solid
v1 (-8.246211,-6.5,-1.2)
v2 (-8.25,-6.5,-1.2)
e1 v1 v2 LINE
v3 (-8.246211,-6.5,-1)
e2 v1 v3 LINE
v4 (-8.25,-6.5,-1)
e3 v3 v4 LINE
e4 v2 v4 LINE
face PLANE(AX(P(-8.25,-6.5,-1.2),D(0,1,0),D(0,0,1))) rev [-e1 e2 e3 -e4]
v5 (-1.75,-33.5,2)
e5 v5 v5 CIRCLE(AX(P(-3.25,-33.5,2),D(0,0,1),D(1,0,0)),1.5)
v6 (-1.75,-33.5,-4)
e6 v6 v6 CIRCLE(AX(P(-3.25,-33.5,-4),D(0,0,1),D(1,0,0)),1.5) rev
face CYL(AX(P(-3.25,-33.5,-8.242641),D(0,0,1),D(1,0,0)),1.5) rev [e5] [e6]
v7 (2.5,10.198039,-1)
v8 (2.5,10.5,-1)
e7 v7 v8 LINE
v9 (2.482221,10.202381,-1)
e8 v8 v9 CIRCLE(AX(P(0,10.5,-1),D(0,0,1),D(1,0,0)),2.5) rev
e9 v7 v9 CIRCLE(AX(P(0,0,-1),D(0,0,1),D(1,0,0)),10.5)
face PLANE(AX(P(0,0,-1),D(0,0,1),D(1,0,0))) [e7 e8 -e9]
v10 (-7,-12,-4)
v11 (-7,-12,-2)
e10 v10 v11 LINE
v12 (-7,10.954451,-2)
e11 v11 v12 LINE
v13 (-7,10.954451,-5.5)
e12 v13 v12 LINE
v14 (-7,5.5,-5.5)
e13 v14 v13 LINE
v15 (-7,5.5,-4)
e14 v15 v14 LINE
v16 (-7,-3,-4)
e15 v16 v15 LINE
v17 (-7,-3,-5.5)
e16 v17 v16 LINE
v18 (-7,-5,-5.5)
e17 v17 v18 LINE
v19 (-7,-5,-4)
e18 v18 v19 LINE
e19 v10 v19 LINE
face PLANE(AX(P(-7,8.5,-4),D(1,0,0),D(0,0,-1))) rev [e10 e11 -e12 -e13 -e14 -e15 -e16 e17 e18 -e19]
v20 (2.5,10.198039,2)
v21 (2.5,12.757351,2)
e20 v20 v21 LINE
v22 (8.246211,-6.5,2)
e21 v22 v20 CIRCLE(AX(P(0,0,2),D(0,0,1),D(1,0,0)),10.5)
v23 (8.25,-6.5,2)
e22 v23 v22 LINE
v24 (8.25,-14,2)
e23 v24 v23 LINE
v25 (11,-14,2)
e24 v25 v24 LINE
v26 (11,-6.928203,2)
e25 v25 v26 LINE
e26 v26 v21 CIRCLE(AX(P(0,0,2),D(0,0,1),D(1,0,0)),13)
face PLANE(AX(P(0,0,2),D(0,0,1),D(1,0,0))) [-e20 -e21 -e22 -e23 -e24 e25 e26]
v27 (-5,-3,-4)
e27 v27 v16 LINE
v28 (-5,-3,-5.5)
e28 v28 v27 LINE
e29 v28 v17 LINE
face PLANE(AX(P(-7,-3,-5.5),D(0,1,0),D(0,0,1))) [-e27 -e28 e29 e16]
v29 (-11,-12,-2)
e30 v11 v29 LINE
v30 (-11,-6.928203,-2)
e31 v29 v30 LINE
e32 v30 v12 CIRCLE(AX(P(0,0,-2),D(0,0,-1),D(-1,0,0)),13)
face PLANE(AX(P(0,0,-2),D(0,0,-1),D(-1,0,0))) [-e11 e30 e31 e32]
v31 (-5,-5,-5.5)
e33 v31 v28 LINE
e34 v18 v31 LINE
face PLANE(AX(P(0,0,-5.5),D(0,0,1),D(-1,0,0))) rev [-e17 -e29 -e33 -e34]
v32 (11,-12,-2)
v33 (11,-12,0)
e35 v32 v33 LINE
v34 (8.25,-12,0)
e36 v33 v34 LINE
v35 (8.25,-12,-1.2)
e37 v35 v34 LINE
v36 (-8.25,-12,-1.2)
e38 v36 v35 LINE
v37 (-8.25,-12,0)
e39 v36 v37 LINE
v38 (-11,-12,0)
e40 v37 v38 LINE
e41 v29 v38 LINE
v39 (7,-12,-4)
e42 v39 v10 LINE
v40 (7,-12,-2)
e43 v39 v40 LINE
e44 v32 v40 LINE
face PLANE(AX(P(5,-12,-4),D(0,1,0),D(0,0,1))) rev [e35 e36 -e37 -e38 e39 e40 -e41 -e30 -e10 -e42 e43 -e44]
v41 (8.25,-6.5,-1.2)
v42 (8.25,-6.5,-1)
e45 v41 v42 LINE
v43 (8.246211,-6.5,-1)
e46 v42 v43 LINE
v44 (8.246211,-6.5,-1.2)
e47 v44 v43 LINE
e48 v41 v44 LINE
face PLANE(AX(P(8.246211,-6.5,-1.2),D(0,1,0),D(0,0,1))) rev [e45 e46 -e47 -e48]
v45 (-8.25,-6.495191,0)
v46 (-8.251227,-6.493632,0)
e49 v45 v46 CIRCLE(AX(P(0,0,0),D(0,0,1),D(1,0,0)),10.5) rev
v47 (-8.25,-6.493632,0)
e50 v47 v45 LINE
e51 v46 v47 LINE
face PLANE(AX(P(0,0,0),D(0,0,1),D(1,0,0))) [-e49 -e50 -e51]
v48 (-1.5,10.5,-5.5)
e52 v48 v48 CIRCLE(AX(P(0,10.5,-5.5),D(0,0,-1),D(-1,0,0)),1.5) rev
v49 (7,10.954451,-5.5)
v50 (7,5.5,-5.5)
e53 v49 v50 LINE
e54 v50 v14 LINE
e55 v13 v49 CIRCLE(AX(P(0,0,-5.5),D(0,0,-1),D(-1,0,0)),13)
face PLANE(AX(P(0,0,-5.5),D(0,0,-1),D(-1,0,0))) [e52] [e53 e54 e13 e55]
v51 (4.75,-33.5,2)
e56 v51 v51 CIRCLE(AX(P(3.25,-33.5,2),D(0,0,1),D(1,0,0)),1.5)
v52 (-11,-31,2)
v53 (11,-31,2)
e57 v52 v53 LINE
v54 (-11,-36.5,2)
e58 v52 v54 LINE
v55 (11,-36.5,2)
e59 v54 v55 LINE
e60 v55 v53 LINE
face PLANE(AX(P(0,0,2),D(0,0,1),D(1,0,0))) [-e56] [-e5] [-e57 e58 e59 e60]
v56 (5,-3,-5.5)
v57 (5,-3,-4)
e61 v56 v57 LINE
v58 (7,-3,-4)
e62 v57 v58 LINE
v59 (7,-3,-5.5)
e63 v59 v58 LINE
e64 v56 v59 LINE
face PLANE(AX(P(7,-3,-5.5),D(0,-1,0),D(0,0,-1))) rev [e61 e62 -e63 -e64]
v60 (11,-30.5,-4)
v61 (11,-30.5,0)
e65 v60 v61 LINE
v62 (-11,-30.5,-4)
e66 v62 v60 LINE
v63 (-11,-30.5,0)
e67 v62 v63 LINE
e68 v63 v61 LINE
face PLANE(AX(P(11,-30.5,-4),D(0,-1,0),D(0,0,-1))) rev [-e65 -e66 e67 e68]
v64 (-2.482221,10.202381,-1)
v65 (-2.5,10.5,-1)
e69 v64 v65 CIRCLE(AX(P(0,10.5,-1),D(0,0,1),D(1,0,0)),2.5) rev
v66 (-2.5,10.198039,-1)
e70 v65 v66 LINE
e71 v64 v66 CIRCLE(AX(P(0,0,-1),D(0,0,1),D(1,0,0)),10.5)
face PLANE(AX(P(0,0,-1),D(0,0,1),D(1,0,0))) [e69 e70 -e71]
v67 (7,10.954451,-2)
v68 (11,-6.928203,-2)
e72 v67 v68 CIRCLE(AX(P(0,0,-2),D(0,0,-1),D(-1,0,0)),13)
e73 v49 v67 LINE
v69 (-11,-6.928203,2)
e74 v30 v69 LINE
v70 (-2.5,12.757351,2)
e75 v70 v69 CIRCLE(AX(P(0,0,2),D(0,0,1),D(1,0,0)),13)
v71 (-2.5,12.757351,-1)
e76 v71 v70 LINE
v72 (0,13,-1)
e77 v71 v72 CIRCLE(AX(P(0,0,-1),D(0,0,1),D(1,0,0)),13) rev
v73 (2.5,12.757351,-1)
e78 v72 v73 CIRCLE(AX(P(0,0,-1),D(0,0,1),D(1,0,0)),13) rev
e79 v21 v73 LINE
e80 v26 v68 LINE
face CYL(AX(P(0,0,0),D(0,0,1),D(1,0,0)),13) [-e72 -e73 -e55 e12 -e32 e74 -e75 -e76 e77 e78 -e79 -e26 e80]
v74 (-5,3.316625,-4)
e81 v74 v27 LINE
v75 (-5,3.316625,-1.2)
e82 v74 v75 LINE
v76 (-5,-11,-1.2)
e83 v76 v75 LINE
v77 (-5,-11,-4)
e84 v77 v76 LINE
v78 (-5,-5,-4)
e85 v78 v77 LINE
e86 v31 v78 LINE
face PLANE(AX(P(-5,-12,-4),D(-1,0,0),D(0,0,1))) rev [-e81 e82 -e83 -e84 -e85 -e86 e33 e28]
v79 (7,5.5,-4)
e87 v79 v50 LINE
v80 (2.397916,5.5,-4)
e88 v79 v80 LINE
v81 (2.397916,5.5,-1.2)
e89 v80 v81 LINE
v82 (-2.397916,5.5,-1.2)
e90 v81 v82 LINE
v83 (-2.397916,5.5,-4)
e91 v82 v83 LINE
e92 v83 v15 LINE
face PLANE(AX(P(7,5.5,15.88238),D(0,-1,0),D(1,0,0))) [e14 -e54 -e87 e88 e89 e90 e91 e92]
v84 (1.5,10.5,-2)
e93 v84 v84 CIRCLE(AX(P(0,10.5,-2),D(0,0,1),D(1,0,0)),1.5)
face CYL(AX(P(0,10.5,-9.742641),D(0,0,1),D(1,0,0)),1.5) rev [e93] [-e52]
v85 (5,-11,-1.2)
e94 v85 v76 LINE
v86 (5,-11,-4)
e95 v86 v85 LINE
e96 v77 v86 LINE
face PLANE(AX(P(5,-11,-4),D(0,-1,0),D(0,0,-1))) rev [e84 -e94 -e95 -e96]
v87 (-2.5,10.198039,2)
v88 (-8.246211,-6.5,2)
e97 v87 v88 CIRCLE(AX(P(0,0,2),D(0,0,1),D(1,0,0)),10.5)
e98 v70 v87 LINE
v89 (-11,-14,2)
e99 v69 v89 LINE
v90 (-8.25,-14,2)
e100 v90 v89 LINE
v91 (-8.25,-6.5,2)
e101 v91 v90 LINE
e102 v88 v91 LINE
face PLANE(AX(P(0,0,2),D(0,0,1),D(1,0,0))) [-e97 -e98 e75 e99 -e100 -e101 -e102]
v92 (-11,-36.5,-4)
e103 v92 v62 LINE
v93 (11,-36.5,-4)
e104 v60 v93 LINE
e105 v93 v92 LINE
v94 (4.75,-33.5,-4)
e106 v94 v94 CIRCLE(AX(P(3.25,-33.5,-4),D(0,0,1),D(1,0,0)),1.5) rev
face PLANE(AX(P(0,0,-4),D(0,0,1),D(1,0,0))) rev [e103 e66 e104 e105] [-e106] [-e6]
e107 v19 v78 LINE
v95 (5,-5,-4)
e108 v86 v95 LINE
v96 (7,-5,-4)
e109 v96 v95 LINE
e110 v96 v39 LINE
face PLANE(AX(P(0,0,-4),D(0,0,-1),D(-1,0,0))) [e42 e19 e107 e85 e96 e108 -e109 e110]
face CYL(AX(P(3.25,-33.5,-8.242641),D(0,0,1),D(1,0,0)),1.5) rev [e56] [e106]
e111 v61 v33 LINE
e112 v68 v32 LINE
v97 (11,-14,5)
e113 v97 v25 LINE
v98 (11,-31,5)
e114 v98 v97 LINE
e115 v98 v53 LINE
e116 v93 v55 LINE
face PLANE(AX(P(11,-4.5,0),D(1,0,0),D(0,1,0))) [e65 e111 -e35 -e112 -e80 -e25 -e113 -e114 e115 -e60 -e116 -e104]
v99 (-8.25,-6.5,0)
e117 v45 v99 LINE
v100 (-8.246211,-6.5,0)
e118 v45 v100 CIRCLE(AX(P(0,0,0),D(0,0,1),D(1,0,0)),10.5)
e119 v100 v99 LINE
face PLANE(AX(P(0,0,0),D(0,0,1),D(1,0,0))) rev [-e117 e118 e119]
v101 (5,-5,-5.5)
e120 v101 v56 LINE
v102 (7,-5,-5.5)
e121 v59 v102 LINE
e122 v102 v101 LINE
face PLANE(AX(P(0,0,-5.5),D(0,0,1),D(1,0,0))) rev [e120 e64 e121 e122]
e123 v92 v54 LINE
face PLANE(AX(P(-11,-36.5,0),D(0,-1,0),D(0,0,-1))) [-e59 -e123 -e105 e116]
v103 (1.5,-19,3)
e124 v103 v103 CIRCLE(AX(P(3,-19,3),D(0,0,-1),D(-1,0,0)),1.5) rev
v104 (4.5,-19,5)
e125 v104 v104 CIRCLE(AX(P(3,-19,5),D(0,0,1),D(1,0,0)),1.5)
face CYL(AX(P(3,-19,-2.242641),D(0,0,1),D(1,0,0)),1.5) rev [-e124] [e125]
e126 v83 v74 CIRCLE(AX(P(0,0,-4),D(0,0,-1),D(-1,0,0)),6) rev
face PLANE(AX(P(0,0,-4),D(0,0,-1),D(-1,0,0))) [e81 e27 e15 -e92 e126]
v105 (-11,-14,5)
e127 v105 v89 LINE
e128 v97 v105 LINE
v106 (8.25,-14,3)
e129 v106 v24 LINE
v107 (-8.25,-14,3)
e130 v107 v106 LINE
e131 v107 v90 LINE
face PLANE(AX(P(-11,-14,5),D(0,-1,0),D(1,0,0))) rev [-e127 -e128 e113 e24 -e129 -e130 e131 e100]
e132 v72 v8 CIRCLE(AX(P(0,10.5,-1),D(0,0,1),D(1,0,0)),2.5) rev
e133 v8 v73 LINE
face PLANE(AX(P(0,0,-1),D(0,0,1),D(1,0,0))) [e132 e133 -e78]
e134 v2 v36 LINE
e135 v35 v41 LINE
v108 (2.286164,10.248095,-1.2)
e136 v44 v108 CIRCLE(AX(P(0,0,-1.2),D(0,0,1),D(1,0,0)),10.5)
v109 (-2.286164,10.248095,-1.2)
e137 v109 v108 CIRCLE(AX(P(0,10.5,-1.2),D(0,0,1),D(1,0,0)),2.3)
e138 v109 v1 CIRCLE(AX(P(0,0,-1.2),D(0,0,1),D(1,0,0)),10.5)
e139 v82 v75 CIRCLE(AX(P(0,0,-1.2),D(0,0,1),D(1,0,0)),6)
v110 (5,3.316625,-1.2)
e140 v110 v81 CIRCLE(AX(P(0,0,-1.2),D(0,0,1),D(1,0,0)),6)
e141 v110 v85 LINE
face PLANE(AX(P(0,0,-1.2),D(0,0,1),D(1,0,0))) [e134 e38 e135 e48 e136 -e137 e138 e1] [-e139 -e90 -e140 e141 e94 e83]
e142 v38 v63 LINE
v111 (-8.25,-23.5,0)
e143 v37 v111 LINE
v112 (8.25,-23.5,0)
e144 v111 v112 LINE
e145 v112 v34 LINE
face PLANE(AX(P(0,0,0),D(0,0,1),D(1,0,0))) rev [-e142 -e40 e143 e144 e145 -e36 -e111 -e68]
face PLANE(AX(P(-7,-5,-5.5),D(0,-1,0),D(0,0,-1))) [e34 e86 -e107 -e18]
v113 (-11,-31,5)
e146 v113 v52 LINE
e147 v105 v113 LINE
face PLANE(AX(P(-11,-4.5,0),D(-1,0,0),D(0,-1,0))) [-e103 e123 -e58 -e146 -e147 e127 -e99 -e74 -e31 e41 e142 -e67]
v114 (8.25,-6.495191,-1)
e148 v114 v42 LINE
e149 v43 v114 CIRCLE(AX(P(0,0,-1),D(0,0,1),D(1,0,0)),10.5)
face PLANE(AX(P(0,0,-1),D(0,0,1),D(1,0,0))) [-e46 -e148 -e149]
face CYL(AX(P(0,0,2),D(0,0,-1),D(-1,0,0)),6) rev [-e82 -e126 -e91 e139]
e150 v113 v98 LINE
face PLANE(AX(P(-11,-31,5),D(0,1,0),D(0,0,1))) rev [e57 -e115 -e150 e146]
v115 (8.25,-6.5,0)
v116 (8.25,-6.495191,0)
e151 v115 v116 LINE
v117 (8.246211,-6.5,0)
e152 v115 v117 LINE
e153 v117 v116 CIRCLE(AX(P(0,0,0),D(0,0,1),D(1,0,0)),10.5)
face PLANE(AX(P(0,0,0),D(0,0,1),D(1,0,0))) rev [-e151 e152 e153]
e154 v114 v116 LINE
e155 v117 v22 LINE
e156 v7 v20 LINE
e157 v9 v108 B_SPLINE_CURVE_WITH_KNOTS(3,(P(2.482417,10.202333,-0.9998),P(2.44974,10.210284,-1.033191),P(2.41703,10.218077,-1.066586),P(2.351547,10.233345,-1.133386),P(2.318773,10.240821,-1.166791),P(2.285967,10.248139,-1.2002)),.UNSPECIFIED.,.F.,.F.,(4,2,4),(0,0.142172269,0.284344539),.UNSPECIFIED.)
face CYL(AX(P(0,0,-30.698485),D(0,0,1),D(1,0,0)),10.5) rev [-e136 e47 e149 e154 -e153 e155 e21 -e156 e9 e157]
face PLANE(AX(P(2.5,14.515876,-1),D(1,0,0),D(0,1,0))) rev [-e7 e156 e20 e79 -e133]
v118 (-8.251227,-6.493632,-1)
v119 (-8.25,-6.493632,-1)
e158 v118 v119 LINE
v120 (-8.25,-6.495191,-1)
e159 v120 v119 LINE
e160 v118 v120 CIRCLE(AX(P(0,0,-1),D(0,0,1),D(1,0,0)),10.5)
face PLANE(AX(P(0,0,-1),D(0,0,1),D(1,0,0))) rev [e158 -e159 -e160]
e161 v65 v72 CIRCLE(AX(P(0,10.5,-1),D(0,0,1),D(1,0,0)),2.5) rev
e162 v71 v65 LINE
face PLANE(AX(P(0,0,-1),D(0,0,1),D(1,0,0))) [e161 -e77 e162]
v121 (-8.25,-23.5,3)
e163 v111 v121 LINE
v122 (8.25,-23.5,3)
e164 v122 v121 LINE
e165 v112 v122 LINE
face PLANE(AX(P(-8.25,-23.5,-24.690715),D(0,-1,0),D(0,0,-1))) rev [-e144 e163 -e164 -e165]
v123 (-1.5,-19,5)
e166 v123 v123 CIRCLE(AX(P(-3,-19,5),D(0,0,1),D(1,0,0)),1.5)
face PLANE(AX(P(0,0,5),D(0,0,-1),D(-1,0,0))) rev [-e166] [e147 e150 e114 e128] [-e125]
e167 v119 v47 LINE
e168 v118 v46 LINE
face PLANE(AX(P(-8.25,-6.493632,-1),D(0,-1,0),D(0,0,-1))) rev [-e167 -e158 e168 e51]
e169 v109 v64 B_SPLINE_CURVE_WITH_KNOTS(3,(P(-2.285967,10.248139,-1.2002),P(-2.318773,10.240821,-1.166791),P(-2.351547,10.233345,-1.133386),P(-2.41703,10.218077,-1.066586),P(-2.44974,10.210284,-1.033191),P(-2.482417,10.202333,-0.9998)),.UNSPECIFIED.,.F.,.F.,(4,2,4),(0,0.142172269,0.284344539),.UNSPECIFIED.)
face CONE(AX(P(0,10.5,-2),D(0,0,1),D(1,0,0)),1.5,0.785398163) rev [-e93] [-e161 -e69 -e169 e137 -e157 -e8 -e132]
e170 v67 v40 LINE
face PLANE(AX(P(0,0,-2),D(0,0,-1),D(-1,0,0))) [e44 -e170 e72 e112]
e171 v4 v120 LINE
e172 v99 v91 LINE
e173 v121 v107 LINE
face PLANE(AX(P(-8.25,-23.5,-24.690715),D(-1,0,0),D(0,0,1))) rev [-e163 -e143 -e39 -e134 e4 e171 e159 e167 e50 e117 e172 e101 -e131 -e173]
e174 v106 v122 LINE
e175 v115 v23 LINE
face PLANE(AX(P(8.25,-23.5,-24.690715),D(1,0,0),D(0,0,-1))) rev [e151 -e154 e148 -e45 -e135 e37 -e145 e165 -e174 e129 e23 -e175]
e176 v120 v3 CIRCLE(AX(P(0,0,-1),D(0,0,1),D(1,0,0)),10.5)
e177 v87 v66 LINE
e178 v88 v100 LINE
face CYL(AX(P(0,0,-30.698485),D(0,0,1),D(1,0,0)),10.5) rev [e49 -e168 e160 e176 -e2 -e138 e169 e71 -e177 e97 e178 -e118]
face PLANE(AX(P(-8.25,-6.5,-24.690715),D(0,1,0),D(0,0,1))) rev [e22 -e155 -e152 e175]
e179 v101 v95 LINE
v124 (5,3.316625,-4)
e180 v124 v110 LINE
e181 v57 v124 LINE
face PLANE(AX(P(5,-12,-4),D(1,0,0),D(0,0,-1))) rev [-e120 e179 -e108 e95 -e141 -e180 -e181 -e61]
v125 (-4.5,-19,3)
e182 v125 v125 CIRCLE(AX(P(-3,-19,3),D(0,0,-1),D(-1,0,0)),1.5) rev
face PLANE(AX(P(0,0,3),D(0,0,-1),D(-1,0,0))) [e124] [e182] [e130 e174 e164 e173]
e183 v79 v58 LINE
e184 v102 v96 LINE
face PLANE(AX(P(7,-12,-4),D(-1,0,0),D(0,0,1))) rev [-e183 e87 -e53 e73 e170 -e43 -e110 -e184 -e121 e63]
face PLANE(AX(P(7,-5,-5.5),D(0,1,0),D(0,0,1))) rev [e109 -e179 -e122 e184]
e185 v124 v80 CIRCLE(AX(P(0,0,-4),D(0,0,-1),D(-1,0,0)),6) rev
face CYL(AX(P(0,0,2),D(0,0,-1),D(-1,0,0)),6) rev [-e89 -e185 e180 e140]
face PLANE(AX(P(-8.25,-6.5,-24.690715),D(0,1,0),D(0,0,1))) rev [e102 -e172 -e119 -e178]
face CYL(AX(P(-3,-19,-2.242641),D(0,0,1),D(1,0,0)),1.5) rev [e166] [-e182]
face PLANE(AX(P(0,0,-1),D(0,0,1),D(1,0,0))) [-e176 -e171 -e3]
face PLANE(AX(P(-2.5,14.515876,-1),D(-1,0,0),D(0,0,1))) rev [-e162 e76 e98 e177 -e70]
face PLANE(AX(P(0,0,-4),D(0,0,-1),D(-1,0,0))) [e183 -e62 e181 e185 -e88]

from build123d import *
from build123d.topology import SkipClean

# Parameters (mm, degrees)
SZKIC1_R                     = 12
SZKIC1_R_2                   = 6
DODANIE_WYCI_GNI_CIE1_DEPTH  = 2
SZKIC3_W                     = 22
SZKIC3_H                     = 32
DODANIE_WYCI_GNI_CIE2_DEPTH  = 2
SZKIC4_W                     = 22
SZKIC4_H                     = 6
DODANIE_WYCI_GNI_CIE3_DEPTH  = 4
SZKIC5_R                     = 1.5
WYTNIJ_WYCI_GNI_CIE1_DEPTH   = 6
SZKIC6_W                     = 10
SZKIC6_H                     = 1
DODANIE_WYCI_GNI_CIE4_DEPTH  = 4
DODANIE_WYCI_GNI_CIE5_START  = 4
DODANIE_WYCI_GNI_CIE5_DEPTH  = 4
DODANIE_WYCI_GNI_CIE6_START  = 4
DODANIE_WYCI_GNI_CIE6_DEPTH  = 4
SZKIC12_R                    = 13
SZKIC12_R_2                  = 8.25
DODANIE_WYCI_GNI_CIE7_DEPTH  = 2
SZKIC13_R                    = 8.25
WYTNIJ_WYCI_GNI_CIE5_DEPTH   = 2
DODANIE_WYCI_GNI_CIE8_DEPTH  = 4
DODANIE_WYCI_GNI_CIE9_START  = -4
DODANIE_WYCI_GNI_CIE9_DEPTH  = 5.5
SZKIC16_W                    = 5
SZKIC16_H                    = 8.571884582
WYTNIJ_WYCI_GNI_CIE6_DEPTH   = 3
SZKIC17_R                    = 1.5
WYTNIJ_WYCI_GNI_CIE7_DEPTH   = 5.5
SZKIC18_R                    = 8.25
WYTNIJ_WYCI_GNI_CIE8_DEPTH   = 1
SZKIC19_W                    = 2
SZKIC19_H                    = 2
DODANIE_WYCI_GNI_CIE10_DEPTH = 1.5
WYTNIJ_WYCI_GNI_CIE9_START   = -3
SZKIC20_R                    = 10.5
WYTNIJ_WYCI_GNI_CIE9_DEPTH   = 3
SZKIC21_W                    = 16.5
SZKIC21_H                    = 17
WYTNIJ_WYCI_GNI_CIE10_DEPTH  = 3
SZKIC22_W                    = 22
SZKIC22_H                    = 17
DODANIE_WYCI_GNI_CIE11_DEPTH = 3
SZKIC24_R                    = 1.5
WYTNIJ_WYCI_GNI_CIE11_DEPTH  = 3
SFAZOWANIE1_SIZE             = 1
DODANIE_WYCI_GNI_CIE14_START = 1
DODANIE_WYCI_GNI_CIE14_DEPTH = 1
DODANIE_WYCI_GNI_CIE15_START = 1
DODANIE_WYCI_GNI_CIE15_DEPTH = 1
SZKIC30_W                    = 2.75
SZKIC30_H                    = 5.506367645
DODANIE_WYCI_GNI_CIE16_DEPTH = 1
DODANIE_WYCI_GNI_CIE17_START = 1
DODANIE_WYCI_GNI_CIE17_DEPTH = 1
SZKIC32_W                    = 2.75
SZKIC32_H                    = 5.07179677
DODANIE_WYCI_GNI_CIE18_DEPTH = 1
SZKIC33_W                    = 16.5
SZKIC33_H                    = 9.5
WYTNIJ_WYCI_GNI_CIE12_DEPTH  = 1
WYTNIJ_WYCI_GNI_CIE13_START  = -0.2
WYTNIJ_WYCI_GNI_CIE13_DEPTH  = 0.2


with BuildPart() as part:
    # Szkic1 → Dodanie-wyciągnięcie1 (new body)
    with BuildSketch(Plane.XY):
        Circle(SZKIC1_R)
        Circle(SZKIC1_R_2, mode=Mode.SUBTRACT)
    extrude(amount=DODANIE_WYCI_GNI_CIE1_DEPTH)

    # Szkic3 → Dodanie-wyciągnięcie2 (add)
    with BuildSketch(Plane.XY.offset(2)):
        with Locations((0, -20.5)):
            Rectangle(SZKIC3_W, SZKIC3_H)
    extrude(amount=-DODANIE_WYCI_GNI_CIE2_DEPTH)

    # Szkic4 → Dodanie-wyciągnięcie3 (add)
    with BuildSketch(Plane(origin=(0, 0, 0), x_dir=(-1, 0, 0), z_dir=(0, 0, -1))):
        with Locations((0, -33.5)):
            Rectangle(SZKIC4_W, SZKIC4_H)
    extrude(amount=DODANIE_WYCI_GNI_CIE3_DEPTH)

    # Szkic5 → Wytnij-wyciągnięcie1 (cut)
    with BuildSketch(Plane.XY.offset(2)):
        with Locations((-3.25, -33.5)):
            Circle(SZKIC5_R)
        with Locations((3.25, -33.5)):
            Circle(SZKIC5_R)
    extrude(amount=-WYTNIJ_WYCI_GNI_CIE1_DEPTH, mode=Mode.SUBTRACT)

    # Szkic6 → Dodanie-wyciągnięcie4 (add)
    with BuildSketch(Plane(origin=(0, 0, 0), x_dir=(-1, 0, 0), z_dir=(0, 0, -1))):
        with Locations((0, -11.5)):
            Rectangle(SZKIC6_W, SZKIC6_H)
    extrude(amount=DODANIE_WYCI_GNI_CIE4_DEPTH)

    # Szkic7 → Dodanie-wyciągnięcie5 (add)
    with BuildSketch(Plane(origin=(0, 0, 0), x_dir=(-1, 0, 0), z_dir=(0, 0, -1)).offset(DODANIE_WYCI_GNI_CIE5_START)):
        with BuildLine():
            Line((-5, 8.5), (-5, 5.5))
            Line((-5, 5.5), (-5, 3.31662479))
            ThreePointArc((-5, 3.31662479), (0, 6), (5, 3.31662479))
            Line((5, 3.31662479), (5, 5.5))
            Line((5, 5.5), (5, 8.5))
            Line((5, 8.5), (-5, 8.5))
        make_face()
    extrude(amount=-DODANIE_WYCI_GNI_CIE5_DEPTH)

    # Szkic9 → Dodanie-wyciągnięcie6 (add)
    with BuildSketch(Plane(origin=(0, 0, 0), x_dir=(-1, 0, 0), z_dir=(0, 0, -1)).offset(DODANIE_WYCI_GNI_CIE6_START)):
        with BuildLine():
            Line((-7, 8.5), (-7, 9.746794345))
            ThreePointArc((-7, 9.746794345), (0, 12), (7, 9.746794345))
            Line((7, 9.746794345), (7, 8.5))
            Line((7, 8.5), (7, -12))
            Line((7, -12), (5, -12))
            Line((5, -12), (5, 8.5))
            Line((5, 8.5), (-5, 8.5))
            Line((-5, 8.5), (-5, -12))
            Line((-5, -12), (-7, -12))
            Line((-7, -12), (-7, 8.5))
        make_face()
    extrude(amount=-DODANIE_WYCI_GNI_CIE6_DEPTH)

    # Szkic12 → Dodanie-wyciągnięcie7 (add)
    with BuildSketch(Plane.XY.offset(2)):
        Circle(SZKIC12_R)
        Circle(SZKIC12_R_2, mode=Mode.SUBTRACT)
    extrude(amount=-DODANIE_WYCI_GNI_CIE7_DEPTH)

    # Szkic13 → Wytnij-wyciągnięcie5 (cut)
    with BuildSketch(Plane.XY.offset(2)):
        Circle(SZKIC13_R)
    extrude(amount=-WYTNIJ_WYCI_GNI_CIE5_DEPTH, mode=Mode.SUBTRACT)

    # Szkic14 → Dodanie-wyciągnięcie8 (add)
    with BuildSketch(Plane(origin=(0, 0, 0), x_dir=(-1, 0, 0), z_dir=(0, 0, -1))):
        with BuildLine():
            Line((-7, 10.95445115), (-7, 9.746794345))
            ThreePointArc((-7, 9.746794345), (0, 12), (7, 9.746794345))
            Line((7, 9.746794345), (7, 10.95445115))
            ThreePointArc((7, 10.95445115), (0, 13), (-7, 10.95445115))
        make_face()
    extrude(amount=DODANIE_WYCI_GNI_CIE8_DEPTH)

    # Szkic15 → Dodanie-wyciągnięcie9 (add)
    with BuildSketch(Plane(origin=(0, 0, -4), x_dir=(-1, 0, 0), z_dir=(0, 0, -1)).offset(DODANIE_WYCI_GNI_CIE9_START)):
        with BuildLine():
            Line((-7, 5.5), (7, 5.5))
            Line((7, 5.5), (7, 10.95445115))
            ThreePointArc((7, 10.95445115), (0, 13), (-7, 10.95445115))
            Line((-7, 10.95445115), (-7, 5.5))
        make_face()
    extrude(amount=DODANIE_WYCI_GNI_CIE9_DEPTH)

    # Szkic16 → Wytnij-wyciągnięcie6 (cut)
    with BuildSketch(Plane.XY.offset(2)):
        with Locations((0, 10.229933778)):
            Rectangle(SZKIC16_W, SZKIC16_H)
    extrude(amount=-WYTNIJ_WYCI_GNI_CIE6_DEPTH, mode=Mode.SUBTRACT)

    # Szkic17 → Wytnij-wyciągnięcie7 (cut)
    with BuildSketch(Plane.XY):
        with Locations((0, 10.5)):
            Circle(SZKIC17_R)
    extrude(amount=-WYTNIJ_WYCI_GNI_CIE7_DEPTH, mode=Mode.SUBTRACT)

    # Szkic18 → Wytnij-wyciągnięcie8 (cut)
    with BuildSketch(Plane.XY):
        Circle(SZKIC18_R)
    extrude(amount=-WYTNIJ_WYCI_GNI_CIE8_DEPTH, mode=Mode.SUBTRACT)

    # Szkic19 → Dodanie-wyciągnięcie10 (add)
    with BuildSketch(Plane(origin=(0, 0, -4), x_dir=(-1, 0, 0), z_dir=(0, 0, -1))):
        with Locations((-6, -4)):
            Rectangle(SZKIC19_W, SZKIC19_H)
    dodanie_wyci_gni_cie10 = extrude(amount=DODANIE_WYCI_GNI_CIE10_DEPTH)

    # Lustro1: Dodanie-wyciągnięcie10 across plane
    add(dodanie_wyci_gni_cie10.mirror(Plane(origin=(0, 0, 0), x_dir=(0, 0, 1), z_dir=(1, 0, 0))))

    # Szkic20 → Wytnij-wyciągnięcie9 (cut)
    with BuildSketch(Plane.XY.offset(2).offset(WYTNIJ_WYCI_GNI_CIE9_START)):
        Circle(SZKIC20_R)
    extrude(amount=WYTNIJ_WYCI_GNI_CIE9_DEPTH, mode=Mode.SUBTRACT)

    # Szkic21 → Wytnij-wyciągnięcie10 (cut)
    with BuildSketch(Plane.XY.offset(2)):
        with Locations((0, -15)):
            Rectangle(SZKIC21_W, SZKIC21_H)
    extrude(amount=-WYTNIJ_WYCI_GNI_CIE10_DEPTH, mode=Mode.SUBTRACT)

    # Szkic22 → Dodanie-wyciągnięcie11 (add)
    with BuildSketch(Plane.XY.offset(2)):
        with Locations((0, -22.5)):
            Rectangle(SZKIC22_W, SZKIC22_H)
    extrude(amount=DODANIE_WYCI_GNI_CIE11_DEPTH)

    # Szkic24 → Wytnij-wyciągnięcie11 (cut)
    with BuildSketch(Plane.XY.offset(5)):
        with Locations((-3, -19)):
            Circle(SZKIC24_R)
        with Locations((3, -19)):
            Circle(SZKIC24_R)
    extrude(amount=-WYTNIJ_WYCI_GNI_CIE11_DEPTH, mode=Mode.SUBTRACT)

    # Sfazowanie1
    sfazowanie1_edges = [part.edges().sort_by_distance(p)[0] for p in [
        (-1.5, 10.5, -1),
    ]]
    chamfer(sfazowanie1_edges, length=SFAZOWANIE1_SIZE - 0.0001)  # a hair under: the kernel refuses the full size

    # Szkic27 → Dodanie-wyciągnięcie14 (add)
    with SkipClean():  # the faces are left unmerged after this step: merging them gives an invalid solid
        with BuildSketch(Plane(origin=(0, 0, 0), x_dir=(-1, 0, 0), z_dir=(0, 0, -1)).offset(DODANIE_WYCI_GNI_CIE14_START)):
            with BuildLine():
                Line((-7, 7.826237921), (-7, 10.95445115))
                ThreePointArc((-7, 10.95445115), (-12.977033627, 0.772397723), (-8.25, -10.046765649))
                Line((-8.25, -10.046765649), (-8.25, -6.495190528))
                ThreePointArc((-8.25, -6.495190528), (-10.460231986, 0.912987837), (-7, 7.826237921))
            make_face()
            with BuildLine():
                Line((7, 7.826237921), (7, 10.95445115))
                ThreePointArc((7, 10.95445115), (12.977033627, 0.772397723), (8.25, -10.046765649))
                Line((8.25, -10.046765649), (8.25, -6.495190528))
                ThreePointArc((8.25, -6.495190528), (10.460231986, 0.912987837), (7, 7.826237921))
            make_face()
        extrude(amount=-DODANIE_WYCI_GNI_CIE14_DEPTH)

    # Szkic29 → Dodanie-wyciągnięcie15 (add)
    with SkipClean():  # the faces are left unmerged after this step: merging them gives an invalid solid
        with BuildSketch(Plane(origin=(0, 0, -1), x_dir=(-1, 0, 0), z_dir=(0, 0, -1)).offset(DODANIE_WYCI_GNI_CIE15_START)):
            with BuildLine():
                Line((11, -6.92820323), (11, -12))
                Line((11, -12), (5, -12))
                Line((5, -12), (5, -11))
                Line((5, -11), (5, 12))
                ThreePointArc((5, 12), (12.392304845, 3.92820323), (11, -6.92820323))
            make_face()
        extrude(amount=-DODANIE_WYCI_GNI_CIE15_DEPTH)

    # Szkic30 → Dodanie-wyciągnięcie16 (add)
    with SkipClean():  # the faces are left unmerged after this step: merging them gives an invalid solid
        with BuildSketch(Plane(origin=(0, 0, 0), x_dir=(-1, 0, 0), z_dir=(0, 0, -1))):
            with Locations((9.625, -9.246816178)):
                Rectangle(SZKIC30_W, SZKIC30_H)
        extrude(amount=DODANIE_WYCI_GNI_CIE16_DEPTH)

    # Szkic31 → Dodanie-wyciągnięcie17 (add)
    with SkipClean():  # the faces are left unmerged after this step: merging them gives an invalid solid
        with BuildSketch(Plane(origin=(0, 0, -1), x_dir=(-1, 0, 0), z_dir=(0, 0, -1)).offset(DODANIE_WYCI_GNI_CIE17_START)):
            with BuildLine():
                Line((-11, -12), (-5.939283137, -12))
                Line((-5.939283137, -12), (-5.939283137, -6.495190528))
                Line((-5.939283137, -6.495190528), (-5.939283137, 11.563948972))
                ThreePointArc((-5.939283137, 11.563948972), (-12.538929442, 3.431508187), (-11, -6.92820323))
                Line((-11, -6.92820323), (-11, -12))
            make_face()
        extrude(amount=-DODANIE_WYCI_GNI_CIE17_DEPTH)

    # Szkic32 → Dodanie-wyciągnięcie18 (add)
    with SkipClean():  # the faces are left unmerged after this step: merging them gives an invalid solid
        with BuildSketch(Plane(origin=(0, 0, 0), x_dir=(-1, 0, 0), z_dir=(0, 0, -1))):
            with Locations((-9.625, -9.464101615)):
                Rectangle(SZKIC32_W, SZKIC32_H)
        extrude(amount=DODANIE_WYCI_GNI_CIE18_DEPTH)

    # Szkic33 → Wytnij-wyciągnięcie12 (cut)
    with SkipClean():  # the faces are left unmerged after this step: merging them gives an invalid solid
        with BuildSketch(Plane(origin=(0, 0, 2), x_dir=(-1, 0, 0), z_dir=(0, 0, -1))):
            with Locations((0, -18.75)):
                Rectangle(SZKIC33_W, SZKIC33_H)
        extrude(amount=-WYTNIJ_WYCI_GNI_CIE12_DEPTH, mode=Mode.SUBTRACT)

    # Wytnij-wyciągnięcie13: read off the stored shape, not the designer's step
    # Wytnij-wyciągnięcie13 outline → Wytnij-wyciągnięcie13 (cut)
    with SkipClean():  # the faces are left unmerged after this step: merging them gives an invalid solid
        with BuildSketch(Plane.XY.offset(-1).offset(WYTNIJ_WYCI_GNI_CIE13_START)):
            with BuildLine():
                Line((-8.246211251, -6.5), (-8.25, -6.5))
                Line((-8.25, -6.5), (-8.25, -12))
                Line((-8.25, -12), (8.25, -12))
                Line((8.25, -12), (8.25, -6.5))
                Line((8.25, -6.5), (8.246211251, -6.5))
                ThreePointArc((8.246211251, -6.5), (9.892290104, 3.520311988), (2.286163597, 10.248095238))
                ThreePointArc((2.286163597, 10.248095238), (0, 8.2), (-2.286163597, 10.248095238))
                ThreePointArc((-2.286163597, 10.248095238), (-9.892290104, 3.520311988), (-8.246211251, -6.5))
            make_face()
            with BuildLine():
                Line((5, 3.31662479), (5, -11))
                Line((5, -11), (-5, -11))
                Line((-5, -11), (-5, 3.31662479))
                ThreePointArc((-5, 3.31662479), (-3.856691747, 4.596295113), (-2.397915762, 5.5))
                Line((-2.397915762, 5.5), (2.397915762, 5.5))
                ThreePointArc((2.397915762, 5.5), (3.856691747, 4.596295113), (5, 3.31662479))
            make_face(mode=Mode.SUBTRACT)
        extrude(amount=WYTNIJ_WYCI_GNI_CIE13_DEPTH, mode=Mode.SUBTRACT)


solid = part.part
